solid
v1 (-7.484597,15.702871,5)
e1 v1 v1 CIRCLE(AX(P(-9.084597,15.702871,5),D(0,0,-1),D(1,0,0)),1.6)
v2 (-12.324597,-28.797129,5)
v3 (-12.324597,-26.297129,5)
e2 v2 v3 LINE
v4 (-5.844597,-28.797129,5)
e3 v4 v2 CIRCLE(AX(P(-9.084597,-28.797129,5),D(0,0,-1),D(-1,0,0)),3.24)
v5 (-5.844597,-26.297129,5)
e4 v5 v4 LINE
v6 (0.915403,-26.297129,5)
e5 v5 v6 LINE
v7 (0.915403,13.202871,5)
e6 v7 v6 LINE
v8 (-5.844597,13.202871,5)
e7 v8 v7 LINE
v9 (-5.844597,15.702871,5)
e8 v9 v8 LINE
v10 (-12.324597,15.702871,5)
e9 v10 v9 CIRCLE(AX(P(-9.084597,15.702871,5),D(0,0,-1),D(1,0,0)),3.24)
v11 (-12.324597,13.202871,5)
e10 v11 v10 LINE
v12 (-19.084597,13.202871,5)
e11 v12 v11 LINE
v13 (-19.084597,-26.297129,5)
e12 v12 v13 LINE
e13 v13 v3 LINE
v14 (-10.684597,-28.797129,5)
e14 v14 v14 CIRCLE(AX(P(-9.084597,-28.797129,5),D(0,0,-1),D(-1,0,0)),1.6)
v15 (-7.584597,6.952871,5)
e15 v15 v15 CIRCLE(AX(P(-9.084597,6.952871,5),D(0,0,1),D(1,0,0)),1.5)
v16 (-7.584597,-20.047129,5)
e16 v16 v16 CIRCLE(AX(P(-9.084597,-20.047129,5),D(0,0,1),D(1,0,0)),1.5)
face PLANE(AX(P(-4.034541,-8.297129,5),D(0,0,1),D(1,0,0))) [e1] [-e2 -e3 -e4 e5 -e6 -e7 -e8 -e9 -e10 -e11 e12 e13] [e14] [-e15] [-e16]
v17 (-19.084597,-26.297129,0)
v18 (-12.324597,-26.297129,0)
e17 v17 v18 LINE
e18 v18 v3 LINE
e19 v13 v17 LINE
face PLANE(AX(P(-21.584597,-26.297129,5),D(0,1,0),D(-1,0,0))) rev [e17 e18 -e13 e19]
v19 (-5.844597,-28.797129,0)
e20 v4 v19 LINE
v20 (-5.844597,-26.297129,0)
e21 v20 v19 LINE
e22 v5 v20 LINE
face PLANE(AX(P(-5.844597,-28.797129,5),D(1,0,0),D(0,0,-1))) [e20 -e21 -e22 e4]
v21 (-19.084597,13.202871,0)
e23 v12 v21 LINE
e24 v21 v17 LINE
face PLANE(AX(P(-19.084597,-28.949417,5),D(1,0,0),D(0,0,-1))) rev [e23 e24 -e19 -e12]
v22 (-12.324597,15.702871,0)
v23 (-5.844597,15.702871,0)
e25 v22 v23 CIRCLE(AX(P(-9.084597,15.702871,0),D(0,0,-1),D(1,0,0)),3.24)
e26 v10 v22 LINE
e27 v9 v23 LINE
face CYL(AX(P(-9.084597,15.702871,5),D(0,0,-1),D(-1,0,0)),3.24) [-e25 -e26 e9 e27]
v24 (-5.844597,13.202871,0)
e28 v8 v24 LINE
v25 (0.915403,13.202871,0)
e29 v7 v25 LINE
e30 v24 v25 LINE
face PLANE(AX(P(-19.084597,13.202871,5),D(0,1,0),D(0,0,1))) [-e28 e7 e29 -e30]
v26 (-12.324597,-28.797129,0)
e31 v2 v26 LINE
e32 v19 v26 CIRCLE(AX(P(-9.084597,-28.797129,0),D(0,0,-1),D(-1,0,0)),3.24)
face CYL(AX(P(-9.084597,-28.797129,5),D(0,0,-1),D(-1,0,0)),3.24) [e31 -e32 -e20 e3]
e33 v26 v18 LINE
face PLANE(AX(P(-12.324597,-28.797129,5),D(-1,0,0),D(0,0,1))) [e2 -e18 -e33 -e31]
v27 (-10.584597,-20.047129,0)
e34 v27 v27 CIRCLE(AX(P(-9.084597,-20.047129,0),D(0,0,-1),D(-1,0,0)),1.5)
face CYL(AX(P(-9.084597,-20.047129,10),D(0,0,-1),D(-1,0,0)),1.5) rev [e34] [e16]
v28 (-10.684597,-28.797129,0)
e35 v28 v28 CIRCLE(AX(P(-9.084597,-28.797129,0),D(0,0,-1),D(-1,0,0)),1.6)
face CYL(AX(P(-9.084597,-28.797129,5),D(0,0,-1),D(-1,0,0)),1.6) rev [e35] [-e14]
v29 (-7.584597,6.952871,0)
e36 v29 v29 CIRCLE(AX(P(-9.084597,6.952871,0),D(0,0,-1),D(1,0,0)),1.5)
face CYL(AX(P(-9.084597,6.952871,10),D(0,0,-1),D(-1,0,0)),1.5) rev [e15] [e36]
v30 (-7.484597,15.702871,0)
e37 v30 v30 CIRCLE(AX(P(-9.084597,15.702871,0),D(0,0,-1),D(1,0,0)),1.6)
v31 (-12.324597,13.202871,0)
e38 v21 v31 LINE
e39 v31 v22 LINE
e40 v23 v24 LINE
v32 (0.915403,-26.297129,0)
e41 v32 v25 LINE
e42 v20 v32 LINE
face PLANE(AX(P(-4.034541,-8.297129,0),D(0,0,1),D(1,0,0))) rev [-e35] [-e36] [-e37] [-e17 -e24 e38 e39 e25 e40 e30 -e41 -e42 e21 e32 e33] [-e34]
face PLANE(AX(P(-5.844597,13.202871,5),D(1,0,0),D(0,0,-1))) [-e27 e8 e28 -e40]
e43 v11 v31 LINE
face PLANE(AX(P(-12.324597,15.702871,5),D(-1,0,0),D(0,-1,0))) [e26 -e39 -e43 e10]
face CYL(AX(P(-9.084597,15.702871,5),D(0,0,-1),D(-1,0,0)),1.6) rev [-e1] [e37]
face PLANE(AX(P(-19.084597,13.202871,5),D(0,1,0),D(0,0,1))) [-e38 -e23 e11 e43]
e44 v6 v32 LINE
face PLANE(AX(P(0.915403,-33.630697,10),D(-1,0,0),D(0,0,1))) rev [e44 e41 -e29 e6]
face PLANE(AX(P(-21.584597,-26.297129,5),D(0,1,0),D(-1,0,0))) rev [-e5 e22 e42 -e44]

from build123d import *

# Parameters (mm, degrees)
ESQUISSE1_R             = 1
ESQUISSE1_R_2           = 1.5
BOSS_EXTRU_1_DEPTH      = 5
ENL_V_MAT_EXTRU_1_DEPTH = 5
ESQUISSE3_W             = 20
ESQUISSE3_H             = 34
BOSS_EXTRU_2_DEPTH      = 5
ESQUISSE4_R             = 1.5
ESQUISSE4_W             = 9.798464728
ESQUISSE4_H             = 39.858161606
ENL_V_MAT_EXTRU_2_DEPTH = 5
ESQUISSE5_W             = 2.5
ESQUISSE5_H             = 34
BOSS_EXTRU_3_DEPTH      = 5
ESQUISSE6_R             = 1.6
BOSS_EXTRU_4_DEPTH      = 5
CONG_1_R                = 10
ESQUISSE7_W             = 40.251504125
ESQUISSE7_H             = 45.079075122
ENL_V_MAT_EXTRU_3_DEPTH = 10
ESQUISSE8_W             = 20
ESQUISSE8_H             = 39.5
ESQUISSE8_R             = 1.5
BOSS_EXTRU_5_DEPTH      = 5
ESQUISSE9_R             = 1.6
BOSS_EXTRU_6_DEPTH      = 5
ESQUISSE10_R            = 1.5
ENL_V_MAT_EXTRU_4_DEPTH = 10
ESQUISSE11_R            = 1.5
ENL_V_MAT_EXTRU_5_DEPTH = 10
BOSS_EXTRU_7_DEPTH      = 5


with BuildPart() as part:
    # Esquisse1 → Boss.-Extru.1 (new body)
    with BuildSketch(Plane.XY):
        with BuildLine():
            Line((-13.584596858, -30.047129187), (-13.584596858, -25.547129187))
            Line((-13.584596858, -25.547129187), (-13.584596858, -25.297129187))
            Line((-13.584596858, -25.297129187), (-13.834596858, -25.297129187))
            Line((-13.834596858, -25.297129187), (-16.334596858, -25.297129187))
            Line((-16.334596858, -25.297129187), (-16.584596858, -25.297129187))
            Line((-16.584596858, -25.297129187), (-16.584596858, -25.047129187))
            Line((-16.584596858, -25.047129187), (-16.584596858, 6.452870813))
            Line((-16.584596858, 6.452870813), (-16.584596858, 6.702870813))
            Line((-16.584596858, 6.702870813), (-16.334596858, 6.702870813))
            Line((-16.334596858, 6.702870813), (-13.834596858, 6.702870813))
            Line((-13.834596858, 6.702870813), (-13.584596858, 6.702870813))
            Line((-13.584596858, 6.702870813), (-13.584596858, 6.952870813))
            Line((-13.584596858, 6.952870813), (-13.584596858, 11.452870813))
            Line((-13.584596858, 11.452870813), (-13.584596858, 11.702870813))
            Line((-13.584596858, 11.702870813), (-13.334596858, 11.702870813))
            Line((-13.334596858, 11.702870813), (-8.584596858, 11.702870813))
            Line((-8.584596858, 11.702870813), (-8.584596858, 6.702870813))
            Line((-8.584596858, 6.702870813), (-7.491776281, 6.702870813))
            Line((-7.491776281, 6.702870813), (-4.034541178, 6.702870813))
            ThreePointArc((-4.034541178, 6.702870813), (-0.161557832, 6.19424756), (3.448773595, 4.702870813))
            ThreePointArc((3.448773595, 4.702870813), (10.66943645, 1.720117321), (18.415403142, 0.702870813))
            ThreePointArc((18.415403142, 0.702870813), (28.415403142, -9.297129187), (18.415403142, -19.297129187))
            ThreePointArc((18.415403142, -19.297129187), (10.66943645, -20.314375694), (3.448773595, -23.297129187))
            ThreePointArc((3.448773595, -23.297129187), (-0.161557832, -24.788505933), (-4.034541178, -25.297129187))
            Line((-4.034541178, -25.297129187), (-7.491776281, -25.297129187))
            Line((-7.491776281, -25.297129187), (-8.584596858, -25.297129187))
            Line((-8.584596858, -25.297129187), (-8.584596858, -30.297129187))
            Line((-8.584596858, -30.297129187), (-13.334596858, -30.297129187))
            Line((-13.334596858, -30.297129187), (-13.584596858, -30.297129187))
            Line((-13.584596858, -30.297129187), (-13.584596858, -30.047129187))
        make_face()
        with Locations((18.477857718, -2.297129187)):
            Circle(ESQUISSE1_R, mode=Mode.SUBTRACT)
        with Locations((25.415403142, -9.359583762)):
            Circle(ESQUISSE1_R, mode=Mode.SUBTRACT)
        with Locations((18.415403142, -9.297129187)):
            Circle(ESQUISSE1_R_2, mode=Mode.SUBTRACT)
        with Locations((11.415403142, -9.234674611)):
            Circle(ESQUISSE1_R, mode=Mode.SUBTRACT)
        with Locations((18.352948567, -16.297129187)):
            Circle(ESQUISSE1_R, mode=Mode.SUBTRACT)
    extrude(amount=BOSS_EXTRU_1_DEPTH)

    # Esquisse2 → Enlèv. mat.-Extru.1 (cut)
    with BuildSketch(Plane(origin=(0, 0, 0), x_dir=(-1, 0, 0), z_dir=(0, 0, -1))):
        Polygon((1.584596858, -19.297129187), (1.584596858, -25.297129187), (1.584596858, -26.297129187), (21.584596858, -26.297129187), (21.584596858, -33.65697819), (-26.833247513, -33.65697819), (-26.198667142, -19.297129187), align=None)
        Polygon((21.584596858, 7.702870813), (1.584596858, 7.702870813), (1.584596858, 6.702870813), (1.584596858, 0.702870813), (-26.198667142, 0.702870813), (-26.833247513, 15.062719816), (21.584596858, 15.062719816), align=None)
    extrude(amount=-ENL_V_MAT_EXTRU_1_DEPTH, mode=Mode.SUBTRACT)

    # Esquisse3 → Boss.-Extru.2 (add)
    with BuildSketch(Plane(origin=(0, 0, 0), x_dir=(-1, 0, 0), z_dir=(0, 0, -1))):
        with Locations((11.584596858, -9.297129187)):
            Rectangle(ESQUISSE3_W, ESQUISSE3_H)
    extrude(amount=-BOSS_EXTRU_2_DEPTH)

    # Esquisse4 → Enlèv. mat.-Extru.2 (cut)
    with BuildSketch(Plane(origin=(0, 0, 0), x_dir=(-1, 0, 0), z_dir=(0, 0, -1))):
        with Locations((9.084596858, -22.797129187)):
            Circle(ESQUISSE4_R)
        with Locations((9.084596858, 4.202870813)):
            Circle(ESQUISSE4_R)
        with Locations((23.983829222, -9.020336398)):
            Rectangle(ESQUISSE4_W, ESQUISSE4_H)
    extrude(amount=-ENL_V_MAT_EXTRU_2_DEPTH, mode=Mode.SUBTRACT)

    # Esquisse5 → Boss.-Extru.3 (add)
    with BuildSketch(Plane(origin=(0, 0, 0), x_dir=(-1, 0, 0), z_dir=(0, 0, -1))):
        with Locations((0.334596858, -9.297129187)):
            Rectangle(ESQUISSE5_W, ESQUISSE5_H)
    extrude(amount=-BOSS_EXTRU_3_DEPTH)

    # Esquisse6 → Boss.-Extru.4 (add)
    # profile 1 of 2: a face of its own
    with BuildSketch(Plane(origin=(0, 0, 0), x_dir=(-1, 0, 0), z_dir=(0, 0, -1))):
        with BuildLine():
            Line((12.324596858, -25.12480516), (5.844596858, -25.12480516))
            Line((5.844596858, -25.12480516), (5.844596858, -28.797129187))
            ThreePointArc((5.844596858, -28.797129187), (9.084596858, -32.037129187), (12.324596858, -28.797129187))
            Line((12.324596858, -28.797129187), (12.324596858, -25.12480516))
        make_face()
        with Locations((9.084596858, -28.797129187)):
            Circle(ESQUISSE6_R, mode=Mode.SUBTRACT)
    # profile 2 of 2: a face of its own
    with BuildSketch(Plane(origin=(0, 0, 0), x_dir=(-1, 0, 0), z_dir=(0, 0, -1))):
        with BuildLine():
            Line((12.324596858, 6.757738308), (5.844596858, 6.757738308))
            Line((5.844596858, 6.757738308), (5.844596858, 10.202870813))
            ThreePointArc((5.844596858, 10.202870813), (9.084596858, 13.442870813), (12.324596858, 10.202870813))
            Line((12.324596858, 10.202870813), (12.324596858, 6.757738308))
        make_face()
        with Locations((9.084596858, 10.202870813)):
            Circle(ESQUISSE6_R, mode=Mode.SUBTRACT)
    extrude(amount=-BOSS_EXTRU_4_DEPTH)

    # Congé1
    # the kernel refuses this fillet: 10 mm, written as the material it adds along each edge
    with BuildSketch(Plane(origin=(0.915403142, 0.702870813, 0), x_dir=(1, 0, 0), z_dir=(0, 0, 1))) as cong_1_piece_1:
        with BuildLine():
            CenterArc((9.539392014, 10), CONG_1_R, 197.457603124, 72.542396876)
            Line((0, 7), (-0.19078784, 6.94))
            ThreePointArc((-0.19078784, 6.94), (-0.2, 3.5), (-0.2, 0))
            Line((-0.2, 0), (0, -0.2))
            Line((0, -0.2), (9.539392014, -0.2))
            Line((9.539392014, -0.2), (9.539392014, 0))
        make_face()
    extrude(amount=5)
    with BuildSketch(Plane(origin=(0.915403142, -19.297129187, 5), x_dir=(0, -1, 0), z_dir=(0, 0, -1))) as cong_1_piece_2:
        with BuildLine():
            CenterArc((10, -9.539392014), CONG_1_R, 107.457603124, 72.542396876)
            Line((0, -9.539392014), (-0.2, -9.539392014))
            Line((-0.2, -9.539392014), (-0.2, 0))
            Line((-0.2, 0), (0, 0.2))
            ThreePointArc((0, 0.2), (3.5, 0.2), (6.94, 0.19078784))
            Line((6.94, 0.19078784), (7, 0))
        make_face()
    extrude(amount=5)

    # Esquisse7 → Enlèv. mat.-Extru.3 (cut)
    with BuildSketch(Plane(origin=(0, 0, 0), x_dir=(-1, 0, 0), z_dir=(0, 0, -1))):
        with Locations((-21.041155205, -11.091158949)):
            Rectangle(ESQUISSE7_W, ESQUISSE7_H)
    extrude(amount=-ENL_V_MAT_EXTRU_3_DEPTH, mode=Mode.SUBTRACT)

    # Esquisse8 → Boss.-Extru.5 (add)
    with BuildSketch(Plane(origin=(0, 0, 0), x_dir=(-1, 0, 0), z_dir=(0, 0, -1))):
        with Locations((9.084596858, -6.547129187)):
            Rectangle(ESQUISSE8_W, ESQUISSE8_H)
        with Locations((9.084596858, -22.797129187)):
            Circle(ESQUISSE8_R, mode=Mode.SUBTRACT)
    extrude(amount=-BOSS_EXTRU_5_DEPTH)

    # Esquisse9 → Boss.-Extru.6 (add)
    with BuildSketch(Plane(origin=(0, 0, 0), x_dir=(-1, 0, 0), z_dir=(0, 0, -1))):
        with BuildLine():
            Line((12.324596858, 15.702870813), (12.324596858, 13.202870813))
            Line((12.324596858, 13.202870813), (10.308361541, 13.202870813))
            ThreePointArc((10.308361541, 13.202870813), (9.084596858, 13.442870813), (7.860832174, 13.202870813))
            Line((7.860832174, 13.202870813), (5.844596858, 13.202870813))
            Line((5.844596858, 13.202870813), (5.844596858, 15.702870813))
            ThreePointArc((5.844596858, 15.702870813), (9.084596858, 18.942870813), (12.324596858, 15.702870813))
        make_face()
        with Locations(Location((9.084596858, 15.702870813, 0), (0, 0, 180))):
            Circle(ESQUISSE9_R, mode=Mode.SUBTRACT)
    extrude(amount=-BOSS_EXTRU_6_DEPTH)

    # Esquisse10 → Enlèv. mat.-Extru.4 (cut)
    with BuildSketch(Plane(origin=(0, 0, 0), x_dir=(-1, 0, 0), z_dir=(0, 0, -1))):
        with Locations(Location((9.084596858, 9.702870813, 0), (0, 0, 180))):
            Circle(ESQUISSE10_R)
    extrude(amount=-ENL_V_MAT_EXTRU_4_DEPTH, mode=Mode.SUBTRACT)

    # Esquisse11 → Enlèv. mat.-Extru.5 (cut)
    with BuildSketch(Plane(origin=(0, 0, 0), x_dir=(-1, 0, 0), z_dir=(0, 0, -1))):
        with Locations((9.084596858, -20.047129187)):
            Circle(ESQUISSE11_R)
        with Locations((9.084596858, 6.952870813)):
            Circle(ESQUISSE11_R)
    extrude(amount=-ENL_V_MAT_EXTRU_5_DEPTH, mode=Mode.SUBTRACT)

    # Esquisse12 → Boss.-Extru.7 (add)
    with BuildSketch(Plane(origin=(0, 0, 0), x_dir=(-1, 0, 0), z_dir=(0, 0, -1))):
        with BuildLine():
            ThreePointArc((9.684075798, 8.327870813), (9.084596858, 11.202870813), (8.485117917, 8.327870813))
            ThreePointArc((8.485117917, 8.327870813), (9.084596858, 8.452870813), (9.684075798, 8.327870813))
        make_face()
        with BuildLine():
            ThreePointArc((8.485117917, -21.422129187), (9.084596858, -24.297129187), (9.684075798, -21.422129187))
            ThreePointArc((9.684075798, -21.422129187), (9.084596858, -21.547129187), (8.485117917, -21.422129187))
        make_face()
    extrude(amount=-BOSS_EXTRU_7_DEPTH)


solid = part.part
